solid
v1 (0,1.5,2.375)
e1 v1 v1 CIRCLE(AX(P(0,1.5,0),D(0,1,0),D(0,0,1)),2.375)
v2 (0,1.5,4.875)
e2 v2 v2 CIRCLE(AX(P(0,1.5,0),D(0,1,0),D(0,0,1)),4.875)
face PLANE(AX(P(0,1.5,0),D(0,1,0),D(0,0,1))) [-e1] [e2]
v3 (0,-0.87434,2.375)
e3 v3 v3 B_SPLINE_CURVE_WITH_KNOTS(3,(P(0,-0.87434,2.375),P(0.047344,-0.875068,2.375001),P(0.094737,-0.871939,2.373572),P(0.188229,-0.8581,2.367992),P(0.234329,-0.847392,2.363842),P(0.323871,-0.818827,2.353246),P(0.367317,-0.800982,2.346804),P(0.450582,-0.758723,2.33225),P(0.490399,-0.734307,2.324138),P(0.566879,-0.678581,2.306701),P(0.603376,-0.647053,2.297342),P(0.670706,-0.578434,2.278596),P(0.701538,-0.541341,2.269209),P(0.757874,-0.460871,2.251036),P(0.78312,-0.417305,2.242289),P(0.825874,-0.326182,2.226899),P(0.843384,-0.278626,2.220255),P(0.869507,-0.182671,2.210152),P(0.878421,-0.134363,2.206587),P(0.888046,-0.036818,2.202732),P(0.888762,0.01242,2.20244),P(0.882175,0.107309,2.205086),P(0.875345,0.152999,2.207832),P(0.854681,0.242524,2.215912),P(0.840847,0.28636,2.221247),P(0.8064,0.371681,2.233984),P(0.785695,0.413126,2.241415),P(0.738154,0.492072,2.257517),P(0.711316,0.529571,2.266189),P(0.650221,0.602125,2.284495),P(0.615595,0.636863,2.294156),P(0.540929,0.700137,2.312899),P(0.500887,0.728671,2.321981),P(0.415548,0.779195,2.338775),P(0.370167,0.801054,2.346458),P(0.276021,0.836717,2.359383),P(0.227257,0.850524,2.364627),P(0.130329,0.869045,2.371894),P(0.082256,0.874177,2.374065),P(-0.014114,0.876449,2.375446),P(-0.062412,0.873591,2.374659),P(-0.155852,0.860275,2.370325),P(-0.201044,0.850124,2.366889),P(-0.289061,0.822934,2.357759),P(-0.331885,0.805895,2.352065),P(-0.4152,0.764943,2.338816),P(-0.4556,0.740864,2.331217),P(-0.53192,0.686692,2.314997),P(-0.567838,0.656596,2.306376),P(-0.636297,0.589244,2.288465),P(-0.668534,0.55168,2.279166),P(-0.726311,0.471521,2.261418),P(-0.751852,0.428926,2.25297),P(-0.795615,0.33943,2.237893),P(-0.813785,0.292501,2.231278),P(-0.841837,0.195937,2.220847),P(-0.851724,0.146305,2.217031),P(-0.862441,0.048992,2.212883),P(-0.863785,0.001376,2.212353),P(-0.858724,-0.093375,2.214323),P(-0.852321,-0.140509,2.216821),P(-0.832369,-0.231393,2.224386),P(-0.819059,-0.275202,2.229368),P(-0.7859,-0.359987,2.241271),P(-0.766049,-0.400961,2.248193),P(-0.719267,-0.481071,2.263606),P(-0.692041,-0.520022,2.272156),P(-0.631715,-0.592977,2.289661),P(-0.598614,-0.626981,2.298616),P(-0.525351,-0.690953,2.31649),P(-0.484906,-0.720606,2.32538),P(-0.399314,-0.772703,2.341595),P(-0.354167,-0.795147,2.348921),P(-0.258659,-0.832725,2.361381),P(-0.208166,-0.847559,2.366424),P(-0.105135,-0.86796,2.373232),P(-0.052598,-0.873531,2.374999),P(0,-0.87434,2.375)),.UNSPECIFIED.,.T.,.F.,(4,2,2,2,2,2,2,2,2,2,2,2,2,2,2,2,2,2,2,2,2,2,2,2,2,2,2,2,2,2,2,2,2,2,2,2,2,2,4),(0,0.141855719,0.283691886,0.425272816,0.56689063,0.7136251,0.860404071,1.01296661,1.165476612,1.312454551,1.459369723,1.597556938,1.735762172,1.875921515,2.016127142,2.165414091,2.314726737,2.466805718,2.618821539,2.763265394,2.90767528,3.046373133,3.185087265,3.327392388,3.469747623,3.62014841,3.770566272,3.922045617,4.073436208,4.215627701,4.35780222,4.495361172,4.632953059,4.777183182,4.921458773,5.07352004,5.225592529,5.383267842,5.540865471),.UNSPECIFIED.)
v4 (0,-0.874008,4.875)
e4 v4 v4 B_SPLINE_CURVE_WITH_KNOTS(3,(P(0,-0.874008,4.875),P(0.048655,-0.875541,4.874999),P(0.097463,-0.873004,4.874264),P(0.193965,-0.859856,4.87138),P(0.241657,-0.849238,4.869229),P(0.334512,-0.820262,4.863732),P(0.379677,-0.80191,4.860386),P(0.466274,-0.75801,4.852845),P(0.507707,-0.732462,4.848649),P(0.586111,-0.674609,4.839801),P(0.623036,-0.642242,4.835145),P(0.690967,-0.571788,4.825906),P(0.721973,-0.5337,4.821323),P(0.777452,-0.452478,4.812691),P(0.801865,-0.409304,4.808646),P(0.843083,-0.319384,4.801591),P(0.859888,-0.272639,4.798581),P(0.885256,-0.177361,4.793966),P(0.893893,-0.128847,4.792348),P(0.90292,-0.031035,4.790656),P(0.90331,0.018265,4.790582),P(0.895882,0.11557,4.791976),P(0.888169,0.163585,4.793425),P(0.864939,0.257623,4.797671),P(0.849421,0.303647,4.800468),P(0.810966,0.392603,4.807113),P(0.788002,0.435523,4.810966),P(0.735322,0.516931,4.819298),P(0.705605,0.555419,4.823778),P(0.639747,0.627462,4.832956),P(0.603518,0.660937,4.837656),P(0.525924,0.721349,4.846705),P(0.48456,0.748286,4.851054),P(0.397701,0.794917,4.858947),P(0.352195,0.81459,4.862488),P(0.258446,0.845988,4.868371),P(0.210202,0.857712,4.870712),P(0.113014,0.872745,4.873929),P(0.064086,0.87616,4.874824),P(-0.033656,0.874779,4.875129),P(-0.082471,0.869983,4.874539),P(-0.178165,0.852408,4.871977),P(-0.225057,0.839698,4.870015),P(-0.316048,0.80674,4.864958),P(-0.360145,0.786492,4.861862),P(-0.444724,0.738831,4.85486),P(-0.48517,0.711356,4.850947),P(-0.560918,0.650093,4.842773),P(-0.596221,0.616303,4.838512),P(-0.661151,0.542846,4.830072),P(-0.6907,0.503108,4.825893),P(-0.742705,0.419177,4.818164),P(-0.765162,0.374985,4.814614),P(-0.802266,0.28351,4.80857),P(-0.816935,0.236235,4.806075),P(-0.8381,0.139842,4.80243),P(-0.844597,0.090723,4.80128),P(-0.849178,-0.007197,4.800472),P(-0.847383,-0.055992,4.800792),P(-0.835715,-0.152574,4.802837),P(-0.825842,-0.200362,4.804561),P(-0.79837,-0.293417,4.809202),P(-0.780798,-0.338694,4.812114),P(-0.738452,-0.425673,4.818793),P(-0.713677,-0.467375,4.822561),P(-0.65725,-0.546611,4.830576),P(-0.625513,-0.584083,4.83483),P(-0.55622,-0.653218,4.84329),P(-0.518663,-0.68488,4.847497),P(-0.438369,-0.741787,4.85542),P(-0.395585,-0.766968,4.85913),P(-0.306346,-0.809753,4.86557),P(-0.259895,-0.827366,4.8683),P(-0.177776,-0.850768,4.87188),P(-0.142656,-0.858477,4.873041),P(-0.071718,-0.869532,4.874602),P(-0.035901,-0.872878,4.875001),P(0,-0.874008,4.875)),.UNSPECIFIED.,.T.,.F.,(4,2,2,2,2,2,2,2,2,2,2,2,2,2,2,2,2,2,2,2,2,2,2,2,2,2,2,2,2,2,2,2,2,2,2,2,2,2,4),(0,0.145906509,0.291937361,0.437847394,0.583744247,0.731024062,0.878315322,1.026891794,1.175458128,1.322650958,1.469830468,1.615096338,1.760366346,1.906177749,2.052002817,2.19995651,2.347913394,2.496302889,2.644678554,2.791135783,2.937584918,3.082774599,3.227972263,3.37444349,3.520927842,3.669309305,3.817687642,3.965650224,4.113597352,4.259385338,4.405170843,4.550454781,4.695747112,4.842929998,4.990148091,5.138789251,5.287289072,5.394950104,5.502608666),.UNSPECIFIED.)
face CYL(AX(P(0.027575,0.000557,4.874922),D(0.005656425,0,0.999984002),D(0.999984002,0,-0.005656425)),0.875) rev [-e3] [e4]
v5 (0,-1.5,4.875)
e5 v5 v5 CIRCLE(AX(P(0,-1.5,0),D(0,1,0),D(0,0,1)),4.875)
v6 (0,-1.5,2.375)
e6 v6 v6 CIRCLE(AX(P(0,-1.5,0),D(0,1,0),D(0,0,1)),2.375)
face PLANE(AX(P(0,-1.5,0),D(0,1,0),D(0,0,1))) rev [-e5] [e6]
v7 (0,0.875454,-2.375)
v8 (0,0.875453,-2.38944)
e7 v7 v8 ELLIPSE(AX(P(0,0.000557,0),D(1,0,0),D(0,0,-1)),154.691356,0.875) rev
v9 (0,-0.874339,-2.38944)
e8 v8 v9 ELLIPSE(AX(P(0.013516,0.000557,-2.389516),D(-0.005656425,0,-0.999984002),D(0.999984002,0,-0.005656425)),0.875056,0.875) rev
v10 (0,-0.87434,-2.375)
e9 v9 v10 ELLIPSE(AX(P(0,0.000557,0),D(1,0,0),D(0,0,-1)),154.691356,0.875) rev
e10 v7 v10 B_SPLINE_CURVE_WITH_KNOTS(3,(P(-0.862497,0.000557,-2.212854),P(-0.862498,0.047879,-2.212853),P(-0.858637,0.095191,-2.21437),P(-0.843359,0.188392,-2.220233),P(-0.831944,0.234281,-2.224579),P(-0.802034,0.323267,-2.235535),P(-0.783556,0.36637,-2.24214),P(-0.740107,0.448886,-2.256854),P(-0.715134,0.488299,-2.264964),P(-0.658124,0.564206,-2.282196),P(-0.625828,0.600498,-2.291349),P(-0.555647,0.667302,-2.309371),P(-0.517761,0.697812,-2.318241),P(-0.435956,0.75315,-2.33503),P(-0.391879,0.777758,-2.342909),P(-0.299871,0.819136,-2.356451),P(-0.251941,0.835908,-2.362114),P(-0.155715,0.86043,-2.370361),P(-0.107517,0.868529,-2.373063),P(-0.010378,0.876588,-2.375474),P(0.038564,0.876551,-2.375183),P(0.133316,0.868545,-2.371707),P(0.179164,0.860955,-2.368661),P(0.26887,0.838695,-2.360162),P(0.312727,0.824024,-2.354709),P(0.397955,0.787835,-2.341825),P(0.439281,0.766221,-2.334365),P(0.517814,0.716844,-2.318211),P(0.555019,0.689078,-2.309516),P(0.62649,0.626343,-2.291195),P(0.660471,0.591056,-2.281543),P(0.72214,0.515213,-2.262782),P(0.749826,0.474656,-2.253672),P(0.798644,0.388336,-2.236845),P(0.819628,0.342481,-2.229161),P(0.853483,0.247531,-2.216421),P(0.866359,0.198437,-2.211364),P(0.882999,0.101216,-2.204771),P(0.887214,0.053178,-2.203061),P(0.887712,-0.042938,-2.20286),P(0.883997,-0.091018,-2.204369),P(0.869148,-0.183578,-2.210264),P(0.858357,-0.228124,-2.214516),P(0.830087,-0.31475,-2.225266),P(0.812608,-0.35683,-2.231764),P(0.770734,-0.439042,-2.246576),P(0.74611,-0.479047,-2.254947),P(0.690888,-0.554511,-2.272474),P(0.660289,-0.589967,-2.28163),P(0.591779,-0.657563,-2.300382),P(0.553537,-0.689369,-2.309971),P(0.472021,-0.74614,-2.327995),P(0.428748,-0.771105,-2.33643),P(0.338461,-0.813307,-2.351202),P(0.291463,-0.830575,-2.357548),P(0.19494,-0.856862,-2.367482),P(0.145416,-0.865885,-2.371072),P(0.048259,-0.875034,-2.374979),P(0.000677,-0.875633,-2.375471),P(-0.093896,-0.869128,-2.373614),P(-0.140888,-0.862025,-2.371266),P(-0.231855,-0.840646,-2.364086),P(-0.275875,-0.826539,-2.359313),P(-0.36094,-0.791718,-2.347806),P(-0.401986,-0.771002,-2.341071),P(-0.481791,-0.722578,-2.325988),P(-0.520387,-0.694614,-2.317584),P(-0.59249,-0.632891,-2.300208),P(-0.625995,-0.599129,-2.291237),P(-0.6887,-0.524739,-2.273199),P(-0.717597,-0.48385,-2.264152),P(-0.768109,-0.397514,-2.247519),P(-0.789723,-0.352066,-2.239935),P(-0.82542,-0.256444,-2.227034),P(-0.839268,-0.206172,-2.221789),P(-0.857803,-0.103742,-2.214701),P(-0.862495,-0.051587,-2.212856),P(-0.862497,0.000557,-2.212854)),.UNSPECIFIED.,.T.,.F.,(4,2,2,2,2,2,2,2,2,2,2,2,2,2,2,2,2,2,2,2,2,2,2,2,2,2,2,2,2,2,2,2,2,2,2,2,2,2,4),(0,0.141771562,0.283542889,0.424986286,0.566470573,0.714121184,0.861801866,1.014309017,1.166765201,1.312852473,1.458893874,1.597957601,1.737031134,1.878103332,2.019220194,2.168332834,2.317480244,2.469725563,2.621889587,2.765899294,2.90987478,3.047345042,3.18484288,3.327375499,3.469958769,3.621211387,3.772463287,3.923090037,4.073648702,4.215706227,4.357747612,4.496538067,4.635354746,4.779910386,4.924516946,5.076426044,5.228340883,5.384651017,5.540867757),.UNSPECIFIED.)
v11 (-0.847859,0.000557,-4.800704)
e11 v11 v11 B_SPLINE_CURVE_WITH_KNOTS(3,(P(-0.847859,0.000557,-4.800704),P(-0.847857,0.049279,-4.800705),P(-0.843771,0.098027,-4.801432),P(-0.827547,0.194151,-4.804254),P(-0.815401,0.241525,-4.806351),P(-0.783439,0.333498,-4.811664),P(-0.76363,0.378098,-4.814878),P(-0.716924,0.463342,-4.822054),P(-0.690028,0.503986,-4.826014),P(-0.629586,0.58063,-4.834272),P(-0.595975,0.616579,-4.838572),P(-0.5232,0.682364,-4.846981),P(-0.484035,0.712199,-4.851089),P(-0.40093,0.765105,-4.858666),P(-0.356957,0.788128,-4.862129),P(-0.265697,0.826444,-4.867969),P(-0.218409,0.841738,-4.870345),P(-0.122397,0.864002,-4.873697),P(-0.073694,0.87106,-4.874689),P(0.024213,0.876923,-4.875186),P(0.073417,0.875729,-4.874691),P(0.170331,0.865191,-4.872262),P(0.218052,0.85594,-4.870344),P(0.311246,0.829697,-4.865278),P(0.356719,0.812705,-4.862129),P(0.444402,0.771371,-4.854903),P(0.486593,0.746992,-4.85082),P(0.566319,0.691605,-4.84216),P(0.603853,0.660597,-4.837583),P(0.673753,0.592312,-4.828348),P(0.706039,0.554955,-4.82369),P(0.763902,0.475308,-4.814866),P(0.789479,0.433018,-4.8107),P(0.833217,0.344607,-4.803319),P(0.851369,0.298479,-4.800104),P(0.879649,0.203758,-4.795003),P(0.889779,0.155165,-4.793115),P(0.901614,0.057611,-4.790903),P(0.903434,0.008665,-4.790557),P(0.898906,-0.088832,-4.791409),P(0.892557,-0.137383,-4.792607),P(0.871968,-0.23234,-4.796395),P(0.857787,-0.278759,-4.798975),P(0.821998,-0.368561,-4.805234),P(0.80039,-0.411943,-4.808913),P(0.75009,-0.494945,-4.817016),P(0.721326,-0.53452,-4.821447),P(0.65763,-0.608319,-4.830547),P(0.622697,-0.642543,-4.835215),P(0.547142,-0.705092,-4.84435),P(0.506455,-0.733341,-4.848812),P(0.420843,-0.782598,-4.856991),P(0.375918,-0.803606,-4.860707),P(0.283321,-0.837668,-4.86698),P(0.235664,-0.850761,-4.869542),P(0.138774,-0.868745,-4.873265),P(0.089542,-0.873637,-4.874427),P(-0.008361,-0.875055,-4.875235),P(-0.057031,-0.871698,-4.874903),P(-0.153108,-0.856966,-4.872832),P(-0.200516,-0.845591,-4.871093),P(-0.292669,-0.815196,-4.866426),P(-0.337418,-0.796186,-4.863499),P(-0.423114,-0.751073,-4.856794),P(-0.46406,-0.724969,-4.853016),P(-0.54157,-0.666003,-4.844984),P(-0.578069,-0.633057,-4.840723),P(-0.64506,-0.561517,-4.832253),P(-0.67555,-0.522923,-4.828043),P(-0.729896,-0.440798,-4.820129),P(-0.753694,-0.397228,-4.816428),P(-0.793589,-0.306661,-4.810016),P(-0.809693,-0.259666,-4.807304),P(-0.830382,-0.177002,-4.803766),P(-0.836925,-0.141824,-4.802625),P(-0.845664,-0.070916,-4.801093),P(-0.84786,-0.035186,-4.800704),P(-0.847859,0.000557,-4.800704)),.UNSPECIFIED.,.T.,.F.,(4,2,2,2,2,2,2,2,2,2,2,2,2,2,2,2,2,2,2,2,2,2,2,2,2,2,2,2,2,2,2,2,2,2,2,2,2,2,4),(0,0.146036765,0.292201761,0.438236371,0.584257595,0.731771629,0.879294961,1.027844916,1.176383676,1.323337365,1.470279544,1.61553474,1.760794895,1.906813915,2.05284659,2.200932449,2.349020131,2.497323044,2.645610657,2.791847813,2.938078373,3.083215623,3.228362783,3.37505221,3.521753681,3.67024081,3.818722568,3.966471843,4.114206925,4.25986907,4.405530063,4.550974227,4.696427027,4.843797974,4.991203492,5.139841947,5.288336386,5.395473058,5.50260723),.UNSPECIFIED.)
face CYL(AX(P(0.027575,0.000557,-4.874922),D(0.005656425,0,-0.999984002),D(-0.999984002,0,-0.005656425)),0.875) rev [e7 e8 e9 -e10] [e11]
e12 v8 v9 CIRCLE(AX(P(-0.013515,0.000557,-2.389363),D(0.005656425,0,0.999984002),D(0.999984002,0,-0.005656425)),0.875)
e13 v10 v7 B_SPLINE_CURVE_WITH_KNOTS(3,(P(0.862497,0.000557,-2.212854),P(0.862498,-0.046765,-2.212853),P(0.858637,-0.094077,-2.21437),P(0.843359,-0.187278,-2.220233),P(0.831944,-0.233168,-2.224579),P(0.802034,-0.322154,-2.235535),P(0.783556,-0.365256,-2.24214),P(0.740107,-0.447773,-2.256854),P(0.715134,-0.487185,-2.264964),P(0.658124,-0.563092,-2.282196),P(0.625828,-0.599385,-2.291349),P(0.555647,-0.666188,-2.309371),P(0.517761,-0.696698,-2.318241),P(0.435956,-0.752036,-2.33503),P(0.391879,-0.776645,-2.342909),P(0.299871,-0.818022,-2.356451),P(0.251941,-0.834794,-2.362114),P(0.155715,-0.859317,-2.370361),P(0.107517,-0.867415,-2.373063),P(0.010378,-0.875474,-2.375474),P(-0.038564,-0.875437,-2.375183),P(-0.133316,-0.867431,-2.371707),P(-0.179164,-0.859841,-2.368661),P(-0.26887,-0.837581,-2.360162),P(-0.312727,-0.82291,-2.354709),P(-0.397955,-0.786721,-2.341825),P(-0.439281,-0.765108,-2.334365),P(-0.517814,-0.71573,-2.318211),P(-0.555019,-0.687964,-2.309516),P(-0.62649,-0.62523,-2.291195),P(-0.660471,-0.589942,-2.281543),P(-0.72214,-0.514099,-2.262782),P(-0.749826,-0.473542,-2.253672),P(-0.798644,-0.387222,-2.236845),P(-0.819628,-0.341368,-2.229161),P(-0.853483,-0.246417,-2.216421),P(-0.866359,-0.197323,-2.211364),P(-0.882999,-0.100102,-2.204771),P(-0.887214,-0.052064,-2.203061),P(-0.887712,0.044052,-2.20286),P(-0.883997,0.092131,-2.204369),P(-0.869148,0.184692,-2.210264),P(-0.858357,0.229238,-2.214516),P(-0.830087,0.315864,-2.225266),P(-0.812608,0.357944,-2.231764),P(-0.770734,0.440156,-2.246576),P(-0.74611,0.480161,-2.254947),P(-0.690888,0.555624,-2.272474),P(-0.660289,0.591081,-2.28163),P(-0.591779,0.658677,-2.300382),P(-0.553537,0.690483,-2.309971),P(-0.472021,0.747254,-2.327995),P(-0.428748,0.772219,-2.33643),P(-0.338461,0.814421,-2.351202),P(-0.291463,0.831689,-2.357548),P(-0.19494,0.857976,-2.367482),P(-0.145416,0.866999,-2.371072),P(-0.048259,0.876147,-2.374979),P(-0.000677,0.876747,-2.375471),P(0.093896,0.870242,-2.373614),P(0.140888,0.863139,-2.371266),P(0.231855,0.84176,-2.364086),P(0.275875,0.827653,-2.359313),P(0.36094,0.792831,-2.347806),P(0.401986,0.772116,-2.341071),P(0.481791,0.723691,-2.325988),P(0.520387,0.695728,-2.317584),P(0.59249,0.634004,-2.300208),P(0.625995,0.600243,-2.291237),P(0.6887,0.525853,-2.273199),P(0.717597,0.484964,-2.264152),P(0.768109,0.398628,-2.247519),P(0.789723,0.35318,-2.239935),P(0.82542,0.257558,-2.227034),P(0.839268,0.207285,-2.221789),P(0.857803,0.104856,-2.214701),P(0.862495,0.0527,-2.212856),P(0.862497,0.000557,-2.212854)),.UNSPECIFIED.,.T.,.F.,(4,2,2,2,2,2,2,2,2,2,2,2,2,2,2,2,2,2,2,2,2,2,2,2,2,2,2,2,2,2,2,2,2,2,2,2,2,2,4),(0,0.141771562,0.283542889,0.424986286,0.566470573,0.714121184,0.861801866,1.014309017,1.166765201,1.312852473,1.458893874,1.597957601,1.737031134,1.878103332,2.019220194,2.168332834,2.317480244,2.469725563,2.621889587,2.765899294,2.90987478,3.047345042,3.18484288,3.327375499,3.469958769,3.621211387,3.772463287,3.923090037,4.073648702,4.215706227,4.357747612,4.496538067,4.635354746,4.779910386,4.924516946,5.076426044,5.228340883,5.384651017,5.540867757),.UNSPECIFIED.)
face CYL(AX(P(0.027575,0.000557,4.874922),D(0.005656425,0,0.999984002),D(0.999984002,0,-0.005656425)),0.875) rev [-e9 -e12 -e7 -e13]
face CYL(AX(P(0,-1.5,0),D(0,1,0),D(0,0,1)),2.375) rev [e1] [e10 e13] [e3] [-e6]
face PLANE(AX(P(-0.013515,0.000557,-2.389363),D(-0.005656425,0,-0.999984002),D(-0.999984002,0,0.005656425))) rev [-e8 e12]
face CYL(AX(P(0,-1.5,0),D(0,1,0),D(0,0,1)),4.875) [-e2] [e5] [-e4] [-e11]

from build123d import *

# Parameters (mm, degrees)
BOSS_EXTRUDE1_DEPTH         = 1.5
BOSS_EXTRUDE1_DEPTH_BACK    = 1.5
HOLDER_RING_R               = 4.875
HOLDER_RING_R_2             = 2.375
M2X0_25_TAPPED_HOLE1_REACH  = 13.016
M2X0_25_TAPPED_HOLE1_BORE_R = 0.875
MIRROR1_START               = -2.389401654
MIRROR1_DEPTH               = 7.264401636


# Read off the part's stored shape, not the designer's step: Mirror1
with BuildPart() as part:
    # holder_ring → Boss-Extrude1 (new, two sides: drawn at the far end of the back side and taken through both)
    with BuildSketch(Plane(origin=(0, 0, 0), x_dir=(1, 0, 0), z_dir=(0, 1, 0)).offset(-BOSS_EXTRUDE1_DEPTH_BACK)):
        with Locations(Location((0, 0, 0), (0, 0, 270))):
            Circle(HOLDER_RING_R)
        with Locations(Location((0, 0, 0), (0, 0, 270))):
            Circle(HOLDER_RING_R_2, mode=Mode.SUBTRACT)
    extrude(amount=BOSS_EXTRUDE1_DEPTH + BOSS_EXTRUDE1_DEPTH_BACK)

    # M2x0.25 Tapped Hole1 bore (on position points) → M2x0.25 Tapped Hole1 (cut, up to next)
    with BuildSketch(Plane(origin=(0.02757507, 0.000556894, -4.874922011), x_dir=(-0.999984002302, 0, -0.005656424646), z_dir=(0.005656424646, 0, -0.999984002302)), mode=Mode.PRIVATE) as m2x0_25_tapped_hole1_sk1:
        Circle(M2X0_25_TAPPED_HOLE1_BORE_R)
    m2x0_25_tapped_hole1_tool1 = extrude(m2x0_25_tapped_hole1_sk1.sketch, amount=-M2X0_25_TAPPED_HOLE1_REACH, mode=Mode.PRIVATE) & part.part
    add(m2x0_25_tapped_hole1_tool1.solids().sort_by_distance((0.027575, 0.000557, -4.874922))[0], mode=Mode.SUBTRACT)

    # Mirror1 outline → Mirror1 (cut)
    with BuildSketch(Plane(origin=(0, 0, 0), x_dir=(0.99998400230215, 0, -0.00565642464579779), z_dir=(0.00565642464579779, 0, 0.99998400230215)).offset(MIRROR1_START)):
        with BuildLine():
            ThreePointArc((0.013515687, -0.874338715), (0.875, 0.000556894), (0.013515687, 0.875452503))
            ThreePointArc((0.013515687, 0.875452503), (-0.875, 0.000556894), (0.013515687, -0.874338715))
        make_face()
    extrude(amount=MIRROR1_DEPTH, mode=Mode.SUBTRACT)


solid = part.part
